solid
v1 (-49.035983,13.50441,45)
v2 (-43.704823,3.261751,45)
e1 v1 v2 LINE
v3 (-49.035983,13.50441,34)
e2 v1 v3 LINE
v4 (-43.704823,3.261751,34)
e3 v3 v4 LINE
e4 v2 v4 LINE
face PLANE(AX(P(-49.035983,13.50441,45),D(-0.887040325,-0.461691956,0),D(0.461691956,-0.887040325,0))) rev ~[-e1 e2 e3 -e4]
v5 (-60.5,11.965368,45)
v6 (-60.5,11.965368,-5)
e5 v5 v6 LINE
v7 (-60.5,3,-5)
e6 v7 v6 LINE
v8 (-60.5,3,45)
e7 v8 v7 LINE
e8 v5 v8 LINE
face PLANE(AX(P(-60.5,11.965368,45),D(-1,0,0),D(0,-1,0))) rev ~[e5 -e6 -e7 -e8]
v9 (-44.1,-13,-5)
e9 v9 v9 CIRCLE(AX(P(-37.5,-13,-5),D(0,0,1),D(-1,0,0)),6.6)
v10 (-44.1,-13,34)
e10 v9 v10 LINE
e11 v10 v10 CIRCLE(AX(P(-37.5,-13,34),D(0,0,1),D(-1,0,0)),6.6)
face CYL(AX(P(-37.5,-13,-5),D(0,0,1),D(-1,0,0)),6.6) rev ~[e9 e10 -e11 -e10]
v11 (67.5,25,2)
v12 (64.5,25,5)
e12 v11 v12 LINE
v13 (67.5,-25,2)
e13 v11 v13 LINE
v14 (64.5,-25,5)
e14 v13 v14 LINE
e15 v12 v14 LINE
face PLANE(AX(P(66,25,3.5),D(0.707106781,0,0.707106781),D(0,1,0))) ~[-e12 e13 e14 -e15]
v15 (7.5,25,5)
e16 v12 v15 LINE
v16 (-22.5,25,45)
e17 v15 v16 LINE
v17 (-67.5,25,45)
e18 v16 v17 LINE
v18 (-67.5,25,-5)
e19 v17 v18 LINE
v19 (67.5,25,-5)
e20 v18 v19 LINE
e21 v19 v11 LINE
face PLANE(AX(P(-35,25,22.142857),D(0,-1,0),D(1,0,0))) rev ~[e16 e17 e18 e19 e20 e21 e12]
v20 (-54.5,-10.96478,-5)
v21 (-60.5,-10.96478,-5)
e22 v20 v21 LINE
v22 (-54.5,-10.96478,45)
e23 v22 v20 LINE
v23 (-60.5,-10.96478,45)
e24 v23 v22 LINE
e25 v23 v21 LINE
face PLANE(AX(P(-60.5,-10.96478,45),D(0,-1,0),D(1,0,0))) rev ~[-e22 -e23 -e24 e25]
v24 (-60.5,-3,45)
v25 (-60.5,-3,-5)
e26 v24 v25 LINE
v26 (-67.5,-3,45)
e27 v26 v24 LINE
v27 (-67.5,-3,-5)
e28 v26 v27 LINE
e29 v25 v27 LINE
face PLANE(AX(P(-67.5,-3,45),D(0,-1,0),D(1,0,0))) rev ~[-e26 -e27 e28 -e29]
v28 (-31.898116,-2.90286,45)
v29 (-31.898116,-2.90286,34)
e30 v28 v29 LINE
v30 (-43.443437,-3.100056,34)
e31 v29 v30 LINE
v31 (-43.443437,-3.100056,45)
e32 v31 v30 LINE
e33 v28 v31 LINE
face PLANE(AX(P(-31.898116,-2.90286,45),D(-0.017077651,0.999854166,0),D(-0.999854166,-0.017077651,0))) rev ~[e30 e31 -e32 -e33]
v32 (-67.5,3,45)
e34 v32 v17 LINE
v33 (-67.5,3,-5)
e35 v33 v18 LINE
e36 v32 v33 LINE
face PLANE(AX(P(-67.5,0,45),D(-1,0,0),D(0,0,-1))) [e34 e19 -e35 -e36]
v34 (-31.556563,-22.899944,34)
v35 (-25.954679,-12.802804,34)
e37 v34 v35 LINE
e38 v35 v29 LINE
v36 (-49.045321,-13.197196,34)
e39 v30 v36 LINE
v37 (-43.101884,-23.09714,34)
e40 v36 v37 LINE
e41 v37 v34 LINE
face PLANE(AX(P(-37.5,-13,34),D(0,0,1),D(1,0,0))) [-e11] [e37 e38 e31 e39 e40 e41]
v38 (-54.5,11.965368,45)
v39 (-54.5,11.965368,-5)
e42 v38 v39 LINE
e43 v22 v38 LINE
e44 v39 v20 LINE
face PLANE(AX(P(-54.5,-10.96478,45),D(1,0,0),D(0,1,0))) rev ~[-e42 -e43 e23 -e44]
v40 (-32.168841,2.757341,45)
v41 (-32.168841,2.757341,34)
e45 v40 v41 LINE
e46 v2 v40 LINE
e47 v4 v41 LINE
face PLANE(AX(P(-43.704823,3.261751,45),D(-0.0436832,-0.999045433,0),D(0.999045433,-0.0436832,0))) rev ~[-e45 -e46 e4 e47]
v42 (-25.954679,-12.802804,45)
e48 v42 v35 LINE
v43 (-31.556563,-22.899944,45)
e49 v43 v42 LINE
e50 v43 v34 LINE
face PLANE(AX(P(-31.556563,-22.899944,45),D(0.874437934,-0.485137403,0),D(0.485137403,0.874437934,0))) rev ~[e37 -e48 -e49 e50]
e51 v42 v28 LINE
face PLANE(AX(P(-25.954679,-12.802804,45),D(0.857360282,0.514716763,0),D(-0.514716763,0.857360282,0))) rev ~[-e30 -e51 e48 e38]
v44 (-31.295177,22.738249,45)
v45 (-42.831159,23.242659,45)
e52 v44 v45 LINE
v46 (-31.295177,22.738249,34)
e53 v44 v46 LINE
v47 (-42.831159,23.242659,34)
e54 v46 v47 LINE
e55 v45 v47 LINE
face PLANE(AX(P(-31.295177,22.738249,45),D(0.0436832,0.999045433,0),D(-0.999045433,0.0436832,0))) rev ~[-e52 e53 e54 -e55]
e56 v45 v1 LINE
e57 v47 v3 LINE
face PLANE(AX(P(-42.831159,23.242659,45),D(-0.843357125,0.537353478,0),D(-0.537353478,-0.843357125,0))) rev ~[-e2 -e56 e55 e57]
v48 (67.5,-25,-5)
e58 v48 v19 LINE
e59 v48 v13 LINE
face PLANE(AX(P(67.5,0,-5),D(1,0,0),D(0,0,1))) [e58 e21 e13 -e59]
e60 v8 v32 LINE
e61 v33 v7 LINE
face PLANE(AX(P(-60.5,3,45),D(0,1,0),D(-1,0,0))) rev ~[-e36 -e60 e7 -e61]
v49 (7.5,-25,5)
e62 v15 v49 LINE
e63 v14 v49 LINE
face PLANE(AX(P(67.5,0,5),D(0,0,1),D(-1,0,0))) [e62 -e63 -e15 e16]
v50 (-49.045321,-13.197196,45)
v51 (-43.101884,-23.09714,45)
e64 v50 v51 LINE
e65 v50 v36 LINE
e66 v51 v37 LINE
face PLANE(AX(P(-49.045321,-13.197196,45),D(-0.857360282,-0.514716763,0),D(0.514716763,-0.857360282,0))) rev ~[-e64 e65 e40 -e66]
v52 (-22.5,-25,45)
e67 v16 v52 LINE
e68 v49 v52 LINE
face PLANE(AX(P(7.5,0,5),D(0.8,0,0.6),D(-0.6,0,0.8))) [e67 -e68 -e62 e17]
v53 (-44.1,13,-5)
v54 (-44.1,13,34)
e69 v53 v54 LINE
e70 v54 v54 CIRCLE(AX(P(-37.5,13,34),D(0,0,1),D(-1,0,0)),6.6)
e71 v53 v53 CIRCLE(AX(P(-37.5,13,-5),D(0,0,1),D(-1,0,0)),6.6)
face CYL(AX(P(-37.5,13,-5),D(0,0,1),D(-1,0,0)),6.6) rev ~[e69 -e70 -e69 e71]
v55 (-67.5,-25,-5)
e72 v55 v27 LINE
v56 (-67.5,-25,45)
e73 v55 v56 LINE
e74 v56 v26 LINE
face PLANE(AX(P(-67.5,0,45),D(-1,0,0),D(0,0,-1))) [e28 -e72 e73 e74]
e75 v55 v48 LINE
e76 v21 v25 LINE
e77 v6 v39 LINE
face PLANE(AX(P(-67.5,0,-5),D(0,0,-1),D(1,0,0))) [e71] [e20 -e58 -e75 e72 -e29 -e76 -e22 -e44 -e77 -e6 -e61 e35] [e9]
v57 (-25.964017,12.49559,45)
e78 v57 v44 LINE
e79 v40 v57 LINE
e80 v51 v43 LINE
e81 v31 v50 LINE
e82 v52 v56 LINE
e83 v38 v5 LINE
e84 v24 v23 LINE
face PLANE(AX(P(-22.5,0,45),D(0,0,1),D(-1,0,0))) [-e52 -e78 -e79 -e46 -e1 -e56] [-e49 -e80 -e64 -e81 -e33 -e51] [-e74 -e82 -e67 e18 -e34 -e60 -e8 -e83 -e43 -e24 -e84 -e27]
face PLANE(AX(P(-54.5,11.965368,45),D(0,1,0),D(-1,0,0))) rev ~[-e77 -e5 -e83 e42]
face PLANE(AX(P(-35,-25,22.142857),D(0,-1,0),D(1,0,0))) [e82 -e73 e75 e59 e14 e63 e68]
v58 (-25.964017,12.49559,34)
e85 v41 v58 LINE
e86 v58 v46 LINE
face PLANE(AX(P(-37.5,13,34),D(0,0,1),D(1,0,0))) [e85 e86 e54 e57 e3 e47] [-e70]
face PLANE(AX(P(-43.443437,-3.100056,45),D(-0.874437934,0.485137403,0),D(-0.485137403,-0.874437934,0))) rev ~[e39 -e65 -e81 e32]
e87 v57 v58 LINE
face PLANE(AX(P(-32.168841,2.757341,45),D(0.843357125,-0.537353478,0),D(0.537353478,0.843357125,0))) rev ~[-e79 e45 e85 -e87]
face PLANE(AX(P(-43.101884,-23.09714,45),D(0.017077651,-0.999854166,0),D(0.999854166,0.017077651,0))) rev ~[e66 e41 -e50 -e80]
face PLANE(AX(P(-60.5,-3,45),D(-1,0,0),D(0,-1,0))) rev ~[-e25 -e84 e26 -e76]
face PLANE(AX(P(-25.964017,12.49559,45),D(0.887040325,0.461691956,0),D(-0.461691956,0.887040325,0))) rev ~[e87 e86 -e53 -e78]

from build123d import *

# Parameters (mm, degrees)
F1_DEPTH       = 25
F2_DEPTH       = 25
F4_D           = 13.2
F4_CBORE_D     = 23
F4_CBORE_DEPTH = 0
F6_DEPTH       = 50.001
F8_DEPTH       = 11
F9_SIZE        = 3


# Not quite as in the source:
# - a feature names something its author has since deleted; it is built from what else it names


with BuildPart() as f1:
    # F0 (on Front) → F1 (new body, symmetric)
    with BuildSketch(Plane.XZ):
        Polygon((67.5, -5), (67.5, 5), (7.5, 5), (-67.5, 5), (-67.5, -5), align=None)
    extrude(amount=F1_DEPTH, both=True)

    # F0 (on Front) → F2 (join, symmetric)
    with BuildSketch(Plane.XZ):
        Polygon((-67.5, 5), (7.5, 5), (-22.5, 45), (-67.5, 45), align=None)
    extrude(amount=F2_DEPTH, both=True)

    # F4 (through all)
    with Locations(Plane(origin=(0, 0, -5), x_dir=(1, 0, 0), z_dir=(0, 0, -1))):
        with Locations((-37.5, 13), (-37.5, -13)):
            CounterBoreHole(F4_D / 2, F4_CBORE_D / 2, F4_CBORE_DEPTH)

    # F5 (on face) → F6 (cut, through all)
    with BuildSketch(Plane.XY.offset(45)):
        Polygon((-60.5, 3), (-67.5, 3), (-67.5, -3), (-60.5, -3), (-60.5, -10.9647801146), (-54.5, -10.9647801146), (-54.5, 11.965367943), (-60.5, 11.965367943), align=None)
    extrude(amount=-F6_DEPTH, mode=Mode.SUBTRACT)

    # F7 (on face) → F8 (cut)
    with BuildSketch(Plane.XY.offset(45)):
        Polygon((-25.954678559, -12.8028042668), (-31.898115794, -2.9028604706), (-43.443437235, -3.1000562039), (-49.045321441, -13.1971957332), (-43.101884206, -23.0971395294), (-31.556562765, -22.8999437961), align=None)
        Polygon((-25.9640170016, 12.4955898546), (-31.2951765009, 22.7382492615), (-42.8311594993, 23.2426594069), (-49.0359829984, 13.5044101454), (-43.7048234991, 3.2617507385), (-32.1688405007, 2.7573405931), align=None)
    extrude(amount=-F8_DEPTH, mode=Mode.SUBTRACT)

    # F9
    f9_edges = [f1.edges().sort_by_distance(p)[0] for p in [
        (67.5, 0, 5),
    ]]
    chamfer(f9_edges, length=F9_SIZE)


solid = f1.part
